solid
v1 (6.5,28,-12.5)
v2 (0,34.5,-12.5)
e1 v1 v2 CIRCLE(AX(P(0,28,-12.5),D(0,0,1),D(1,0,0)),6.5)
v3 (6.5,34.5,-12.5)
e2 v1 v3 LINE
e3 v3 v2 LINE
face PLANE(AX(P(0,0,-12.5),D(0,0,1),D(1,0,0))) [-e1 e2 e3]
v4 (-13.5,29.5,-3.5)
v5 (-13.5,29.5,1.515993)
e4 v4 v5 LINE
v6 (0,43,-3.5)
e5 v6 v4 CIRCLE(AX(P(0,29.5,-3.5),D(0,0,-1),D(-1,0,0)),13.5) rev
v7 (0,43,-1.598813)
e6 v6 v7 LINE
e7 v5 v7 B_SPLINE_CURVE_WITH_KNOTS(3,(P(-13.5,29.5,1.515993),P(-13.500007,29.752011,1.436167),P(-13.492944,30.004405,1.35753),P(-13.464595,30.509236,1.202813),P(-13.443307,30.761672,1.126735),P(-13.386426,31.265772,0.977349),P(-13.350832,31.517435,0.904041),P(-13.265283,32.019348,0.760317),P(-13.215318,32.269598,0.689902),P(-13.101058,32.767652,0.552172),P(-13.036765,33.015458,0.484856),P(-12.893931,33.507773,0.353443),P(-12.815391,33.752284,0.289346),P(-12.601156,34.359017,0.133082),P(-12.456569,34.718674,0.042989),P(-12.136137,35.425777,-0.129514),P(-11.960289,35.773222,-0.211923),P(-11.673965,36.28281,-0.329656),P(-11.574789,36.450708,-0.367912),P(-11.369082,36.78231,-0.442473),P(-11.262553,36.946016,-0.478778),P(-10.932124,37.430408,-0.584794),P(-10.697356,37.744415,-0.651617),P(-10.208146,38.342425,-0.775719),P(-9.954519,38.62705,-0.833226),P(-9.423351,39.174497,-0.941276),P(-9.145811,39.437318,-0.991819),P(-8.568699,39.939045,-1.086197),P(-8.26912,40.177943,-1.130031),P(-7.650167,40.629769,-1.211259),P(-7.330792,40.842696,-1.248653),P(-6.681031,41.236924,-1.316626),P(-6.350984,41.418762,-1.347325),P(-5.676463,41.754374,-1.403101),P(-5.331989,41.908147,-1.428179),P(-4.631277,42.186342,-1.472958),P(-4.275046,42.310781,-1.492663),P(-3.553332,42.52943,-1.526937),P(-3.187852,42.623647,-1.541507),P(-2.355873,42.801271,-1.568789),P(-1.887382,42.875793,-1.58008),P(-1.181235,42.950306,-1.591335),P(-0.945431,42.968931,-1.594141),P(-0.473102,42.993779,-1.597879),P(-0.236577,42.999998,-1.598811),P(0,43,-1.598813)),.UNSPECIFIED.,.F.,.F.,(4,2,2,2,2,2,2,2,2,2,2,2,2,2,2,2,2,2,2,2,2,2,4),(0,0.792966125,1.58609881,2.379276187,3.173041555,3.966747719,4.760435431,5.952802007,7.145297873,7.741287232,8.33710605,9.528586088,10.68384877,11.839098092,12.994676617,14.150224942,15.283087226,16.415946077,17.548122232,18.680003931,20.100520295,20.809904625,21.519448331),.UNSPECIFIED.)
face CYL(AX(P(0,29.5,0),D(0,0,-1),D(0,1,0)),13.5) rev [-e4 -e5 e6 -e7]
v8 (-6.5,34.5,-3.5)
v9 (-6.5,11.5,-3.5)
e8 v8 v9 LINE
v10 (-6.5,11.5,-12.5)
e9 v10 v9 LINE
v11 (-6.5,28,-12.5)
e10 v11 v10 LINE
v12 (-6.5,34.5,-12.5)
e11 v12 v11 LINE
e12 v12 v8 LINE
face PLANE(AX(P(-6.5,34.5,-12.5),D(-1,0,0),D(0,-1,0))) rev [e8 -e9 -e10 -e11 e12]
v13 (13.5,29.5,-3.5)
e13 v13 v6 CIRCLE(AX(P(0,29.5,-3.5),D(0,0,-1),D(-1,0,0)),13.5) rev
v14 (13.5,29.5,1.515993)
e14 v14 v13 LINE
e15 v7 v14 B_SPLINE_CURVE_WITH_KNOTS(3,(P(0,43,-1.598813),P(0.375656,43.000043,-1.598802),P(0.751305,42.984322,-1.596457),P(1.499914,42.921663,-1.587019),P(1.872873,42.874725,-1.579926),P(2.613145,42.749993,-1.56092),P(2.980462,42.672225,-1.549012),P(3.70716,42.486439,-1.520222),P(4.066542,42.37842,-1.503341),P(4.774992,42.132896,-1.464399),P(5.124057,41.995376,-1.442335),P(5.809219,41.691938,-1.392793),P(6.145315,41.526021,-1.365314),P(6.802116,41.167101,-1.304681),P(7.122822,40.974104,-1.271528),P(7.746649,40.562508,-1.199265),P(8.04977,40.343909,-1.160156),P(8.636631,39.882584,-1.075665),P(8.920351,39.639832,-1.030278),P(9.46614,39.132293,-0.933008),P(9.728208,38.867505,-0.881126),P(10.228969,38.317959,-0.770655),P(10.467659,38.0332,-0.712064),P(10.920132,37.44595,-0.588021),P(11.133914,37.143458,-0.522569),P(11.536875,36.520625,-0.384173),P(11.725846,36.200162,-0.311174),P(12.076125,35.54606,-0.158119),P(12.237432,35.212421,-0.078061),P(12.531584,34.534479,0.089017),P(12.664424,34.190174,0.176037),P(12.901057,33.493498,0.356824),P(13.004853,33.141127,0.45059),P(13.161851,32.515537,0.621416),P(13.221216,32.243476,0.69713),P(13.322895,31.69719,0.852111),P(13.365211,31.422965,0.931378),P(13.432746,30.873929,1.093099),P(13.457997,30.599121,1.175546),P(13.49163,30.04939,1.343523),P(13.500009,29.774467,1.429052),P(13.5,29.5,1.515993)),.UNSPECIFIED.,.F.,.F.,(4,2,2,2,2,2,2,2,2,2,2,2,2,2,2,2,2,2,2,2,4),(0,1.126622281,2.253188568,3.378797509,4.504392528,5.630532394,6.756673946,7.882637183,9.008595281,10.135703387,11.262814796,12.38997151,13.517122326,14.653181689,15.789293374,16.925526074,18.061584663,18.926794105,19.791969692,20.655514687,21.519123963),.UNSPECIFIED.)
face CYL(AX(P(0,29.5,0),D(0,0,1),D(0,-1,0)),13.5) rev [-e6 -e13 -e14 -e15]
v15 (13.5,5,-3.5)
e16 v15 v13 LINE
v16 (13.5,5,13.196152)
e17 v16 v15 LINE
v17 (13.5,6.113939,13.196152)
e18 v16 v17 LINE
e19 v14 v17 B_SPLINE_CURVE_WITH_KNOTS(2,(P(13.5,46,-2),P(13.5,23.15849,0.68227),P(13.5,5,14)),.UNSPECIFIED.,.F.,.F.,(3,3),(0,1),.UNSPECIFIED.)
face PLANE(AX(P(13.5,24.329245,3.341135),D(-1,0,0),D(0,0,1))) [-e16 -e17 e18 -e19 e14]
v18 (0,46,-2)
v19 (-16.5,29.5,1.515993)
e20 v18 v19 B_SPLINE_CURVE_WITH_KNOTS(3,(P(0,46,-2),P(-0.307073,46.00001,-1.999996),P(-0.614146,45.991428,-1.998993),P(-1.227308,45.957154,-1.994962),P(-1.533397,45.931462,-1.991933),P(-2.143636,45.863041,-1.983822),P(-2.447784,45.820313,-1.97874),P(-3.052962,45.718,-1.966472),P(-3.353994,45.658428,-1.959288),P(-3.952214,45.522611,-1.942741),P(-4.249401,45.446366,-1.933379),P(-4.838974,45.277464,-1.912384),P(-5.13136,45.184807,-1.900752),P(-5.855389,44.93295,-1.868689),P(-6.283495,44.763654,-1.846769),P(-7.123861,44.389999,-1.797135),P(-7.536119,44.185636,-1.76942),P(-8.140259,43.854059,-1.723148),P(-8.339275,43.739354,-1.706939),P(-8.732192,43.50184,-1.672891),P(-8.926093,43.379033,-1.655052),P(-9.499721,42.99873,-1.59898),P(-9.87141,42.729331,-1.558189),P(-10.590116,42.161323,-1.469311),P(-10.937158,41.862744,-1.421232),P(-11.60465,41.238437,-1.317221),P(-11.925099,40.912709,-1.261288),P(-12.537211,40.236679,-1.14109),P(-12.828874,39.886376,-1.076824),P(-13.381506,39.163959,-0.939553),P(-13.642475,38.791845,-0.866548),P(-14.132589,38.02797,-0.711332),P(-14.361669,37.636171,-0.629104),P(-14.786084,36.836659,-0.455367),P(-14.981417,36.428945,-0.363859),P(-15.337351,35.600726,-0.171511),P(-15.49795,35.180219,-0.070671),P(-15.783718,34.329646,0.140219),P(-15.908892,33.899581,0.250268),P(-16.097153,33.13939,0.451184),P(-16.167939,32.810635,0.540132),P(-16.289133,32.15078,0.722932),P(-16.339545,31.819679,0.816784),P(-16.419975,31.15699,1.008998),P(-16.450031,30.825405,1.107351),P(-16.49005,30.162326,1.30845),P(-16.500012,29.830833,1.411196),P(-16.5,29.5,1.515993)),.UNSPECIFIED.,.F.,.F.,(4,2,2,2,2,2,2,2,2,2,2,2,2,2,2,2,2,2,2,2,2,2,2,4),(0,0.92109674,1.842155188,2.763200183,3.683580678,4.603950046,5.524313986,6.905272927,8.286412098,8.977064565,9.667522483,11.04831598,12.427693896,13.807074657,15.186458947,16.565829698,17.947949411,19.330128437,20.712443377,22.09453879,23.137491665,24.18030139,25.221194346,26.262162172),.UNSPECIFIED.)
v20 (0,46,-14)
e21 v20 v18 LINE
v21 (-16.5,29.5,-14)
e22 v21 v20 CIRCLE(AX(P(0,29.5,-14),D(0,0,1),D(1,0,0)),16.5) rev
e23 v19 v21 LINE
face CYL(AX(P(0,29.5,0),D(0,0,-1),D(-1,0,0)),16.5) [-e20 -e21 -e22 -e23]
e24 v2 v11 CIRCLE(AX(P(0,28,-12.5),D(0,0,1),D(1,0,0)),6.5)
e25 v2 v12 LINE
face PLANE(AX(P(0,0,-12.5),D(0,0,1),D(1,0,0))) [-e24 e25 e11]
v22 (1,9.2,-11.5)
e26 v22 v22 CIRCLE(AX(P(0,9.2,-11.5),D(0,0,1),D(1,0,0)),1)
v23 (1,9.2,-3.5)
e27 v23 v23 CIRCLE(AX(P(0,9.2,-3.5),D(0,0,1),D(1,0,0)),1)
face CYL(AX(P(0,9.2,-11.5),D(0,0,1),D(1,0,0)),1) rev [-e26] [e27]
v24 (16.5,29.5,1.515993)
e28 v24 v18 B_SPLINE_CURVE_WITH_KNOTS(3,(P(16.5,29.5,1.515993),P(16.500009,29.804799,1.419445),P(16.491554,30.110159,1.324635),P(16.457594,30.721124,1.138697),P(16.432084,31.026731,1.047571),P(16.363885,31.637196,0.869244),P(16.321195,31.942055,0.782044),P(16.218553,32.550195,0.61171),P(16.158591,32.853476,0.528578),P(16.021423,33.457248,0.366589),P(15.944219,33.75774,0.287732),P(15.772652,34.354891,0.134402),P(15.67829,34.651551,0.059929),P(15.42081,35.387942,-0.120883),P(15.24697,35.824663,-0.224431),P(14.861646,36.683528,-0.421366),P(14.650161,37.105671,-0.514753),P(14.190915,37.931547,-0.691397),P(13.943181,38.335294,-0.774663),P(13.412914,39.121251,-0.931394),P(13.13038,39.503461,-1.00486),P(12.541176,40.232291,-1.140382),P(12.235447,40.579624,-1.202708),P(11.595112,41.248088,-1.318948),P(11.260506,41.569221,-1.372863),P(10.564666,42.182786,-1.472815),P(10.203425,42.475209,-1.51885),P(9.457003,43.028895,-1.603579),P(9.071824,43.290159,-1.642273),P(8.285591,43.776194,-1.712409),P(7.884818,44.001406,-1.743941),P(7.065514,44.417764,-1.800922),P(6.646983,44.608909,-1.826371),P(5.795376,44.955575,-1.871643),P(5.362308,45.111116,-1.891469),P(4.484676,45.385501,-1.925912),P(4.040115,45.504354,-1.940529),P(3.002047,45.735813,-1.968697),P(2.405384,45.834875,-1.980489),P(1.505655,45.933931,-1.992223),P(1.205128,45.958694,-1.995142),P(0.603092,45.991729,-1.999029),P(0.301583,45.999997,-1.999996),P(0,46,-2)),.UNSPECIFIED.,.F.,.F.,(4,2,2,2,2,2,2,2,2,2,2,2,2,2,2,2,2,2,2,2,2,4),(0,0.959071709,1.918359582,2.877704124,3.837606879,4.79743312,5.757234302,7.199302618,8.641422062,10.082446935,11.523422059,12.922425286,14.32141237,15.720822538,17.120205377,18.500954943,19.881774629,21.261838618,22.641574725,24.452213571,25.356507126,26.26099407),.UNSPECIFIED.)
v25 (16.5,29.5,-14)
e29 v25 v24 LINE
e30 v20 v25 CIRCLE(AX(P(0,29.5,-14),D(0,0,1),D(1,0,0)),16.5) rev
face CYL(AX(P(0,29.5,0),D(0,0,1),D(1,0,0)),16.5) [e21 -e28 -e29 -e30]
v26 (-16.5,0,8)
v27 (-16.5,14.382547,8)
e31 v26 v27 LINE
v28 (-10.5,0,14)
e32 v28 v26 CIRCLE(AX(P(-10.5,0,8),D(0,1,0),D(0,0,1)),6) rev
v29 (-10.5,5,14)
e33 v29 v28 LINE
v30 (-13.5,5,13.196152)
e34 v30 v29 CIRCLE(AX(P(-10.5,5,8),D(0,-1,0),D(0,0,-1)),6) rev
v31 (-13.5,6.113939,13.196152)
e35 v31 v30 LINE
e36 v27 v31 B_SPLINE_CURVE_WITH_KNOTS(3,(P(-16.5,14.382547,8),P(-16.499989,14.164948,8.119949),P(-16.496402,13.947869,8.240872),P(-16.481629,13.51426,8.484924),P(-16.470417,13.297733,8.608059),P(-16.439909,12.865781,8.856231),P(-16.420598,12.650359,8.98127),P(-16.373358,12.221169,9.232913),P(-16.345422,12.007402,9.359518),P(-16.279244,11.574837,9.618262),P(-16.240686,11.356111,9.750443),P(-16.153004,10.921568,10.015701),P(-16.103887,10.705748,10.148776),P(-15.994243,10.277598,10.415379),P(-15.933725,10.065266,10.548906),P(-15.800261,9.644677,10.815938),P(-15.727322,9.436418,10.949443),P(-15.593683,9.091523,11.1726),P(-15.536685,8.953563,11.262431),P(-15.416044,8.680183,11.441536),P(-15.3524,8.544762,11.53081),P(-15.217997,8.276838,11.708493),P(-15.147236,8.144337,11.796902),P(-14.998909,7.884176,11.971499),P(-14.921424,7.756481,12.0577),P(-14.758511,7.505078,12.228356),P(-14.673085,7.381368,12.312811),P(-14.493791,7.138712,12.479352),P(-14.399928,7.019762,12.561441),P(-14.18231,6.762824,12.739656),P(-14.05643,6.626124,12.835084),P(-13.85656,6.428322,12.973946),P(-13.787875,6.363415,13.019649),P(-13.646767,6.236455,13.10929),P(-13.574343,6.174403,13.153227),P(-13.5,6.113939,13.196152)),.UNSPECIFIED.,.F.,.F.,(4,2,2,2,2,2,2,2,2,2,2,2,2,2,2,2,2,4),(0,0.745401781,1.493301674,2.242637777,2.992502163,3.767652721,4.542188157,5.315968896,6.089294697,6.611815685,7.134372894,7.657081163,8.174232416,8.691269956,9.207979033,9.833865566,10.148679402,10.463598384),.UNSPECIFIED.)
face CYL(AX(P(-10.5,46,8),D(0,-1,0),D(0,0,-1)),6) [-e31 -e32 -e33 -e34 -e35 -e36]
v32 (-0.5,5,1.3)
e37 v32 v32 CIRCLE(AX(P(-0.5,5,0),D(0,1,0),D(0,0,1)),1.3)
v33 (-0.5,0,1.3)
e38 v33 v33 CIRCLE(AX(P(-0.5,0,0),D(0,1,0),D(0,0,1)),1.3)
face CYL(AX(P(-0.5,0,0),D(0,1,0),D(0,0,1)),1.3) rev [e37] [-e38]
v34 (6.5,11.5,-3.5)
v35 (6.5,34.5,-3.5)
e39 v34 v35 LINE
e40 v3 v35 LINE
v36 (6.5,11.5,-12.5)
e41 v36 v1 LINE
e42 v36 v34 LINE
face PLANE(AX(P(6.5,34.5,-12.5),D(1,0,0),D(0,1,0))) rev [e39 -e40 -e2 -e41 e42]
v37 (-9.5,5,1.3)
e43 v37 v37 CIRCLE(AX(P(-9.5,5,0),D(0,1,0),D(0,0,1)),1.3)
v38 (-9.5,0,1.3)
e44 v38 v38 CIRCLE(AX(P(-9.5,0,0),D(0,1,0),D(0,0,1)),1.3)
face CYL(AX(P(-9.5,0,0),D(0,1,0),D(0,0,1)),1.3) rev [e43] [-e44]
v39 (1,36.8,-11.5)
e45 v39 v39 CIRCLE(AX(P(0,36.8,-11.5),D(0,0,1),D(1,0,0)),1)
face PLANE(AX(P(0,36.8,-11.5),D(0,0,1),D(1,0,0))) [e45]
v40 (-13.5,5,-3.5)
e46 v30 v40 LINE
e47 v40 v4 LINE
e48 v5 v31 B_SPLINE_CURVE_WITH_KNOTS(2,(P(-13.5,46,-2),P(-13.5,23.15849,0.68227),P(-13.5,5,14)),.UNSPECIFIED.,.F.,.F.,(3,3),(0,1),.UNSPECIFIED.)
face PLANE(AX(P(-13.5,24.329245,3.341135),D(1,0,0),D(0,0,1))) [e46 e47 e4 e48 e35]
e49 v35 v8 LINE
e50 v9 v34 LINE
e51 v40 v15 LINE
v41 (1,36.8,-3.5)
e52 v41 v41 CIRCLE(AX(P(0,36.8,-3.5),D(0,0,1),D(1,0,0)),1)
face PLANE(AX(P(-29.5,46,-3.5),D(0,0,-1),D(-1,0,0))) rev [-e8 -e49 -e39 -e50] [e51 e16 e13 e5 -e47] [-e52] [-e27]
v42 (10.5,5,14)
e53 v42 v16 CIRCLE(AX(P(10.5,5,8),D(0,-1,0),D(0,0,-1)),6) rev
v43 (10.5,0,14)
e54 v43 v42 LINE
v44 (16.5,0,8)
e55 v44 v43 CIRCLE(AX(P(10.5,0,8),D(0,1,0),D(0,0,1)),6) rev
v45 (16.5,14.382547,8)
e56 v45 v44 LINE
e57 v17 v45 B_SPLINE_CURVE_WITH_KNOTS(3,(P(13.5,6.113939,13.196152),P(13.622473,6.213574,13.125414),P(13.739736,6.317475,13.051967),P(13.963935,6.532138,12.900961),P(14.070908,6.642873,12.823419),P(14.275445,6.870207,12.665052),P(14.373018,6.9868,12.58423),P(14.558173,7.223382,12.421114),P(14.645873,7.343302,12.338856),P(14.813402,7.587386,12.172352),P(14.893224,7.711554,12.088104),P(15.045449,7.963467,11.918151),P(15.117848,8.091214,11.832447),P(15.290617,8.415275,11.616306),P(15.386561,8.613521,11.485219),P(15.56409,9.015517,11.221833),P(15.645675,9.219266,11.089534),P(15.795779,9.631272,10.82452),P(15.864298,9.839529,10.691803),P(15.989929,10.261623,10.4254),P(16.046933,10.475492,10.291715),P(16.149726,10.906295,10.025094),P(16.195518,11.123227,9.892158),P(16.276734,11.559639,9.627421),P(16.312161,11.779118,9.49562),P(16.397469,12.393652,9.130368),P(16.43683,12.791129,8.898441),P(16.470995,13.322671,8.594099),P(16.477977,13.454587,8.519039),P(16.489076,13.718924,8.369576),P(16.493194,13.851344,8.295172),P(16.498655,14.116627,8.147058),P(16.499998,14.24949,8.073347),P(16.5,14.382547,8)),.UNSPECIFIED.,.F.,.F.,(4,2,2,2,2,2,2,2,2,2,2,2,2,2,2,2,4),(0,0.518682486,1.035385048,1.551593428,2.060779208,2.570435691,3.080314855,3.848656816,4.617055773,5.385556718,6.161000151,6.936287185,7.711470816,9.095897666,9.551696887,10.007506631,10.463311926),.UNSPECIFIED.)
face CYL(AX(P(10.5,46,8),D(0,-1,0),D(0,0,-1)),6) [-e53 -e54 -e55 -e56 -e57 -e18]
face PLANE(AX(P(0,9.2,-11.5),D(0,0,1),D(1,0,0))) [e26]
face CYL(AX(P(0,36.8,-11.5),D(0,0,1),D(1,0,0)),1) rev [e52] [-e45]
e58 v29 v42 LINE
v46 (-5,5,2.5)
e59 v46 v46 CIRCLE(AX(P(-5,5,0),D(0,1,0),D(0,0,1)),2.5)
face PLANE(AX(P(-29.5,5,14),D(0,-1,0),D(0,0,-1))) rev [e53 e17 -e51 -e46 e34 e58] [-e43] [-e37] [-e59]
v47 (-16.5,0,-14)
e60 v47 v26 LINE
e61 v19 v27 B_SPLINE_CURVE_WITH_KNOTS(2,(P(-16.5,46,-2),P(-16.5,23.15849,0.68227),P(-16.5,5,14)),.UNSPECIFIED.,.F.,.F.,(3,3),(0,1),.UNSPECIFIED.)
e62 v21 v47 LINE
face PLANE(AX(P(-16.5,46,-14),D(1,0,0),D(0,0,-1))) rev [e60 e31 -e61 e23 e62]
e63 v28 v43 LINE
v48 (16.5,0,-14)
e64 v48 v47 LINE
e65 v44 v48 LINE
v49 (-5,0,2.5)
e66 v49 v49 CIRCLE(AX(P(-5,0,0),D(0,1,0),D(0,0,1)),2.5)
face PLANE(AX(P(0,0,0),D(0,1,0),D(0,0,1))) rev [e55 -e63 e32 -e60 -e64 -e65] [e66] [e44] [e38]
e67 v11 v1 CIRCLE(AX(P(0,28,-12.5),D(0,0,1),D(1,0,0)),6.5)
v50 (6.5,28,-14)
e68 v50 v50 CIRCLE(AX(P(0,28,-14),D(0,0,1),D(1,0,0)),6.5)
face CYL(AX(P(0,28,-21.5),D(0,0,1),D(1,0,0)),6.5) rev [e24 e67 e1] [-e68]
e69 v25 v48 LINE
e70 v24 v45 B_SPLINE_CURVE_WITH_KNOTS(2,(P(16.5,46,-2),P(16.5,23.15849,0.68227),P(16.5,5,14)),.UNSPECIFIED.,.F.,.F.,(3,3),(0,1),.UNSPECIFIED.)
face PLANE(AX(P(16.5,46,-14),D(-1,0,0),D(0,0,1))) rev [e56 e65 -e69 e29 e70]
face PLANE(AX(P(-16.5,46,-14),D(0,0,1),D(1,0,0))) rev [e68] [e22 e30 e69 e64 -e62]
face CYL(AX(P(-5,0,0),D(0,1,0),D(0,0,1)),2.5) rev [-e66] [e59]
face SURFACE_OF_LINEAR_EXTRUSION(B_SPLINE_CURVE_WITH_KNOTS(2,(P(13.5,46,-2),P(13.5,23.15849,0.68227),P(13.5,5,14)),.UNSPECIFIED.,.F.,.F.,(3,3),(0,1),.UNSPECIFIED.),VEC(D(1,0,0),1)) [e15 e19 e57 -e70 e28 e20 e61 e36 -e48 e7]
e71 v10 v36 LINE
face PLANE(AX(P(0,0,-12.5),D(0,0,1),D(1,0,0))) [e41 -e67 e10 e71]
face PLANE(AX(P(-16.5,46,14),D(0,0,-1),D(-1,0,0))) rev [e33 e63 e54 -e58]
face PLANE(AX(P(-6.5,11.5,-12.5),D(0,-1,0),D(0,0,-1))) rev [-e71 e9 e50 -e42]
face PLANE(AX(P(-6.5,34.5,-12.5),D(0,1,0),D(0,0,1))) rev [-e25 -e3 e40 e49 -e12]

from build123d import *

# Parameters (mm, degrees)
SKETCH1_W           = 33
SKETCH1_H           = 28
BOSS_EXTRUDE1_DEPTH = 46
SKETCH2_W           = 17.5
SKETCH2_H           = 41
CUT_EXTRUDE1_DEPTH  = 46
BOSS_EXTRUDE2_DEPTH = 3
BOSS_EXTRUDE3_DEPTH = 27
FILLET1_START       = -3.5
FILLET1_DEPTH       = 5.015993094
FILLET1_START_2     = -13.5
FILLET1_2_DEPTH     = 27
FILLET2_R           = 16.5
FILLET3_R           = 6
SKETCH5_W           = 13
SKETCH5_H           = 23
CUT_EXTRUDE4_DEPTH  = 9
SKETCH6_R           = 6.5
CUT_EXTRUDE5_DEPTH  = 9
SKETCH7_R           = 1
CUT_EXTRUDE6_DEPTH  = 8
SKETCH8_R           = 1.3
SKETCH8_R_2         = 2.5
CUT_EXTRUDE7_DEPTH  = 47.360004936


with BuildPart() as part:
    # Sketch1 → Boss-Extrude1 (new body)
    with BuildSketch(Plane(origin=(0, 0, 0), x_dir=(1, 0, 0), z_dir=(0, 1, 0))):
        Rectangle(SKETCH1_W, SKETCH1_H)
    extrude(amount=BOSS_EXTRUDE1_DEPTH)

    # Sketch2 → Cut-Extrude1 (cut)
    with BuildSketch(Plane(origin=(16.5, 0, 0), x_dir=(0, 0, -1), z_dir=(1, 0, 0))):
        with Locations((-5.25, 25.5)):
            Rectangle(SKETCH2_W, SKETCH2_H)
    extrude(amount=-CUT_EXTRUDE1_DEPTH, mode=Mode.SUBTRACT)

    # Sketch3 → Boss-Extrude2 (add)
    with BuildSketch(Plane(origin=(16.5, 0, 0), x_dir=(0, 0, -1), z_dir=(1, 0, 0))):
        with BuildLine():
            Line((3.5, 46), (2, 46))
            add(Edge.make_bspline(
                [(-14, 5), (-0.68227026, 23.158489921), (2, 46)],
                knots=[0, 0, 0, 1, 1, 1], degree=2))
            Line((-14, 5), (3.5, 5))
            Line((3.5, 5), (3.5, 46))
        make_face()
    boss_extrude2 = extrude(amount=-BOSS_EXTRUDE2_DEPTH)

    # Mirror1: Boss-Extrude2 across plane
    add(boss_extrude2.mirror(Plane(origin=(0, 0, 0), x_dir=(0, 0, 1), z_dir=(1, 0, 0))))

    # Sketch4 → Boss-Extrude3 (add)
    with BuildSketch(Plane.ZY.offset(-13.5)):
        with BuildLine():
            Line((-3.5, 46), (-3.5, 43))
            Line((-3.5, 43), (-1.598813094, 43))
            add(Edge.make_bspline(
                [(-1.598813094, 43), (-1.82265352, 44.489763885), (-2.000000005, 46.000000046)],
                knots=[0.933881948, 0.933881948, 0.933881948, 1, 1, 1], degree=2))
            Line((-2.000000005, 46.000000046), (-3.5, 46))
        make_face()
    extrude(amount=BOSS_EXTRUDE3_DEPTH)

    # Fillet1: read off the stored shape, not the designer's step
    # Fillet1 outline → Fillet1 (add)
    with BuildSketch(Plane.XY.offset(FILLET1_START)):
        with BuildLine():
            ThreePointArc((-13.5, 29.5), (-9.545941546, 39.045941546), (0, 43))
            Line((0, 43), (-13.5, 43))
            Line((-13.5, 43), (-13.5, 29.5))
        make_face()
        with BuildLine():
            ThreePointArc((0, 43), (9.545941546, 39.045941546), (13.5, 29.5))
            Line((13.5, 29.5), (13.5, 43))
            Line((13.5, 43), (0, 43))
        make_face()
    extrude(amount=FILLET1_DEPTH)

    # Fillet1 2 outline → Fillet1 2 (cut)
    with BuildSketch(Plane.YZ.offset(FILLET1_START_2)):
        with BuildLine():
            add(Edge.make_bspline(
                [(43, -1.598813094), (36.02565956, -0.550902514), (29.499999971, 1.515993003)],
                knots=[0.066118051, 0.066118051, 0.066118051, 0.375650194, 0.375650194, 0.375650194], degree=2))
            Line((43, -1.598813094), (43, 1.515993094))
            Line((43, 1.515993094), (29.499999971, 1.515993003))
        make_face()
    extrude(amount=FILLET1_2_DEPTH, mode=Mode.SUBTRACT)

    # Fillet2
    # the kernel refuses this fillet: 16.5 mm, written as the material it takes off along each edge
    with BuildSketch(Plane(origin=(16.5, 46, -55.25), x_dir=(0, -1, 0), z_dir=(0, 0, 1)), Plane(origin=(-16.5, 46, 39.25), x_dir=(0, -1, 0), z_dir=(0, 0, -1))) as fillet2_piece_1:
        with BuildLine():
            CenterArc((FILLET2_R, -FILLET2_R), FILLET2_R, 90, 90)
            Line((0, -FILLET2_R), (0, 0))
            Line((0, 0), (FILLET2_R, 0))
        make_face()
    extrude(amount=94.5, mode=Mode.SUBTRACT)

    # Fillet3
    # the kernel refuses this fillet: 6 mm, written as the material it takes off along each edge
    with BuildSketch(Plane(origin=(-16.5, -15, 14), x_dir=(1, 0, 0), z_dir=(0, 1, 0)), Plane(origin=(16.5, -15, 14), x_dir=(0, 0, -1), z_dir=(0, 1, 0))) as fillet3_piece_1:
        with BuildLine():
            CenterArc((FILLET3_R, FILLET3_R), FILLET3_R, 180, 90)
            Line((0, FILLET3_R), (0, 0))
            Line((0, 0), (FILLET3_R, 0))
        make_face()
    extrude(amount=35, mode=Mode.SUBTRACT)

    # Sketch5 → Cut-Extrude4 (cut)
    with BuildSketch(Plane.XY.offset(-3.5)):
        with Locations((0, 23)):
            Rectangle(SKETCH5_W, SKETCH5_H)
    extrude(amount=-CUT_EXTRUDE4_DEPTH, mode=Mode.SUBTRACT)

    # Sketch6 → Cut-Extrude5 (cut)
    with BuildSketch(Plane.XY.offset(-12.5)):
        with Locations((0, 28)):
            Circle(SKETCH6_R)
    extrude(amount=-CUT_EXTRUDE5_DEPTH, mode=Mode.SUBTRACT)

    # Sketch7 → Cut-Extrude6 (cut)
    with BuildSketch(Plane.XY.offset(-3.5)):
        with Locations((0, 36.8)):
            Circle(SKETCH7_R)
        with Locations((0, 9.2)):
            Circle(SKETCH7_R)
    extrude(amount=-CUT_EXTRUDE6_DEPTH, mode=Mode.SUBTRACT)

    # Sketch8 → Cut-Extrude7 (cut, through all)
    with BuildSketch(Plane(origin=(0, 5, 0), x_dir=(1, 0, 0), z_dir=(0, 1, 0))):
        with Locations(Location((-0.5, 0, 0), (0, 0, 270))):
            Circle(SKETCH8_R)
        with Locations(Location((-5, 0, 0), (0, 0, 270))):
            Circle(SKETCH8_R_2)
        with Locations(Location((-9.5, 0, 0), (0, 0, 270))):
            Circle(SKETCH8_R)
    extrude(amount=-CUT_EXTRUDE7_DEPTH, mode=Mode.SUBTRACT)


solid = part.part
